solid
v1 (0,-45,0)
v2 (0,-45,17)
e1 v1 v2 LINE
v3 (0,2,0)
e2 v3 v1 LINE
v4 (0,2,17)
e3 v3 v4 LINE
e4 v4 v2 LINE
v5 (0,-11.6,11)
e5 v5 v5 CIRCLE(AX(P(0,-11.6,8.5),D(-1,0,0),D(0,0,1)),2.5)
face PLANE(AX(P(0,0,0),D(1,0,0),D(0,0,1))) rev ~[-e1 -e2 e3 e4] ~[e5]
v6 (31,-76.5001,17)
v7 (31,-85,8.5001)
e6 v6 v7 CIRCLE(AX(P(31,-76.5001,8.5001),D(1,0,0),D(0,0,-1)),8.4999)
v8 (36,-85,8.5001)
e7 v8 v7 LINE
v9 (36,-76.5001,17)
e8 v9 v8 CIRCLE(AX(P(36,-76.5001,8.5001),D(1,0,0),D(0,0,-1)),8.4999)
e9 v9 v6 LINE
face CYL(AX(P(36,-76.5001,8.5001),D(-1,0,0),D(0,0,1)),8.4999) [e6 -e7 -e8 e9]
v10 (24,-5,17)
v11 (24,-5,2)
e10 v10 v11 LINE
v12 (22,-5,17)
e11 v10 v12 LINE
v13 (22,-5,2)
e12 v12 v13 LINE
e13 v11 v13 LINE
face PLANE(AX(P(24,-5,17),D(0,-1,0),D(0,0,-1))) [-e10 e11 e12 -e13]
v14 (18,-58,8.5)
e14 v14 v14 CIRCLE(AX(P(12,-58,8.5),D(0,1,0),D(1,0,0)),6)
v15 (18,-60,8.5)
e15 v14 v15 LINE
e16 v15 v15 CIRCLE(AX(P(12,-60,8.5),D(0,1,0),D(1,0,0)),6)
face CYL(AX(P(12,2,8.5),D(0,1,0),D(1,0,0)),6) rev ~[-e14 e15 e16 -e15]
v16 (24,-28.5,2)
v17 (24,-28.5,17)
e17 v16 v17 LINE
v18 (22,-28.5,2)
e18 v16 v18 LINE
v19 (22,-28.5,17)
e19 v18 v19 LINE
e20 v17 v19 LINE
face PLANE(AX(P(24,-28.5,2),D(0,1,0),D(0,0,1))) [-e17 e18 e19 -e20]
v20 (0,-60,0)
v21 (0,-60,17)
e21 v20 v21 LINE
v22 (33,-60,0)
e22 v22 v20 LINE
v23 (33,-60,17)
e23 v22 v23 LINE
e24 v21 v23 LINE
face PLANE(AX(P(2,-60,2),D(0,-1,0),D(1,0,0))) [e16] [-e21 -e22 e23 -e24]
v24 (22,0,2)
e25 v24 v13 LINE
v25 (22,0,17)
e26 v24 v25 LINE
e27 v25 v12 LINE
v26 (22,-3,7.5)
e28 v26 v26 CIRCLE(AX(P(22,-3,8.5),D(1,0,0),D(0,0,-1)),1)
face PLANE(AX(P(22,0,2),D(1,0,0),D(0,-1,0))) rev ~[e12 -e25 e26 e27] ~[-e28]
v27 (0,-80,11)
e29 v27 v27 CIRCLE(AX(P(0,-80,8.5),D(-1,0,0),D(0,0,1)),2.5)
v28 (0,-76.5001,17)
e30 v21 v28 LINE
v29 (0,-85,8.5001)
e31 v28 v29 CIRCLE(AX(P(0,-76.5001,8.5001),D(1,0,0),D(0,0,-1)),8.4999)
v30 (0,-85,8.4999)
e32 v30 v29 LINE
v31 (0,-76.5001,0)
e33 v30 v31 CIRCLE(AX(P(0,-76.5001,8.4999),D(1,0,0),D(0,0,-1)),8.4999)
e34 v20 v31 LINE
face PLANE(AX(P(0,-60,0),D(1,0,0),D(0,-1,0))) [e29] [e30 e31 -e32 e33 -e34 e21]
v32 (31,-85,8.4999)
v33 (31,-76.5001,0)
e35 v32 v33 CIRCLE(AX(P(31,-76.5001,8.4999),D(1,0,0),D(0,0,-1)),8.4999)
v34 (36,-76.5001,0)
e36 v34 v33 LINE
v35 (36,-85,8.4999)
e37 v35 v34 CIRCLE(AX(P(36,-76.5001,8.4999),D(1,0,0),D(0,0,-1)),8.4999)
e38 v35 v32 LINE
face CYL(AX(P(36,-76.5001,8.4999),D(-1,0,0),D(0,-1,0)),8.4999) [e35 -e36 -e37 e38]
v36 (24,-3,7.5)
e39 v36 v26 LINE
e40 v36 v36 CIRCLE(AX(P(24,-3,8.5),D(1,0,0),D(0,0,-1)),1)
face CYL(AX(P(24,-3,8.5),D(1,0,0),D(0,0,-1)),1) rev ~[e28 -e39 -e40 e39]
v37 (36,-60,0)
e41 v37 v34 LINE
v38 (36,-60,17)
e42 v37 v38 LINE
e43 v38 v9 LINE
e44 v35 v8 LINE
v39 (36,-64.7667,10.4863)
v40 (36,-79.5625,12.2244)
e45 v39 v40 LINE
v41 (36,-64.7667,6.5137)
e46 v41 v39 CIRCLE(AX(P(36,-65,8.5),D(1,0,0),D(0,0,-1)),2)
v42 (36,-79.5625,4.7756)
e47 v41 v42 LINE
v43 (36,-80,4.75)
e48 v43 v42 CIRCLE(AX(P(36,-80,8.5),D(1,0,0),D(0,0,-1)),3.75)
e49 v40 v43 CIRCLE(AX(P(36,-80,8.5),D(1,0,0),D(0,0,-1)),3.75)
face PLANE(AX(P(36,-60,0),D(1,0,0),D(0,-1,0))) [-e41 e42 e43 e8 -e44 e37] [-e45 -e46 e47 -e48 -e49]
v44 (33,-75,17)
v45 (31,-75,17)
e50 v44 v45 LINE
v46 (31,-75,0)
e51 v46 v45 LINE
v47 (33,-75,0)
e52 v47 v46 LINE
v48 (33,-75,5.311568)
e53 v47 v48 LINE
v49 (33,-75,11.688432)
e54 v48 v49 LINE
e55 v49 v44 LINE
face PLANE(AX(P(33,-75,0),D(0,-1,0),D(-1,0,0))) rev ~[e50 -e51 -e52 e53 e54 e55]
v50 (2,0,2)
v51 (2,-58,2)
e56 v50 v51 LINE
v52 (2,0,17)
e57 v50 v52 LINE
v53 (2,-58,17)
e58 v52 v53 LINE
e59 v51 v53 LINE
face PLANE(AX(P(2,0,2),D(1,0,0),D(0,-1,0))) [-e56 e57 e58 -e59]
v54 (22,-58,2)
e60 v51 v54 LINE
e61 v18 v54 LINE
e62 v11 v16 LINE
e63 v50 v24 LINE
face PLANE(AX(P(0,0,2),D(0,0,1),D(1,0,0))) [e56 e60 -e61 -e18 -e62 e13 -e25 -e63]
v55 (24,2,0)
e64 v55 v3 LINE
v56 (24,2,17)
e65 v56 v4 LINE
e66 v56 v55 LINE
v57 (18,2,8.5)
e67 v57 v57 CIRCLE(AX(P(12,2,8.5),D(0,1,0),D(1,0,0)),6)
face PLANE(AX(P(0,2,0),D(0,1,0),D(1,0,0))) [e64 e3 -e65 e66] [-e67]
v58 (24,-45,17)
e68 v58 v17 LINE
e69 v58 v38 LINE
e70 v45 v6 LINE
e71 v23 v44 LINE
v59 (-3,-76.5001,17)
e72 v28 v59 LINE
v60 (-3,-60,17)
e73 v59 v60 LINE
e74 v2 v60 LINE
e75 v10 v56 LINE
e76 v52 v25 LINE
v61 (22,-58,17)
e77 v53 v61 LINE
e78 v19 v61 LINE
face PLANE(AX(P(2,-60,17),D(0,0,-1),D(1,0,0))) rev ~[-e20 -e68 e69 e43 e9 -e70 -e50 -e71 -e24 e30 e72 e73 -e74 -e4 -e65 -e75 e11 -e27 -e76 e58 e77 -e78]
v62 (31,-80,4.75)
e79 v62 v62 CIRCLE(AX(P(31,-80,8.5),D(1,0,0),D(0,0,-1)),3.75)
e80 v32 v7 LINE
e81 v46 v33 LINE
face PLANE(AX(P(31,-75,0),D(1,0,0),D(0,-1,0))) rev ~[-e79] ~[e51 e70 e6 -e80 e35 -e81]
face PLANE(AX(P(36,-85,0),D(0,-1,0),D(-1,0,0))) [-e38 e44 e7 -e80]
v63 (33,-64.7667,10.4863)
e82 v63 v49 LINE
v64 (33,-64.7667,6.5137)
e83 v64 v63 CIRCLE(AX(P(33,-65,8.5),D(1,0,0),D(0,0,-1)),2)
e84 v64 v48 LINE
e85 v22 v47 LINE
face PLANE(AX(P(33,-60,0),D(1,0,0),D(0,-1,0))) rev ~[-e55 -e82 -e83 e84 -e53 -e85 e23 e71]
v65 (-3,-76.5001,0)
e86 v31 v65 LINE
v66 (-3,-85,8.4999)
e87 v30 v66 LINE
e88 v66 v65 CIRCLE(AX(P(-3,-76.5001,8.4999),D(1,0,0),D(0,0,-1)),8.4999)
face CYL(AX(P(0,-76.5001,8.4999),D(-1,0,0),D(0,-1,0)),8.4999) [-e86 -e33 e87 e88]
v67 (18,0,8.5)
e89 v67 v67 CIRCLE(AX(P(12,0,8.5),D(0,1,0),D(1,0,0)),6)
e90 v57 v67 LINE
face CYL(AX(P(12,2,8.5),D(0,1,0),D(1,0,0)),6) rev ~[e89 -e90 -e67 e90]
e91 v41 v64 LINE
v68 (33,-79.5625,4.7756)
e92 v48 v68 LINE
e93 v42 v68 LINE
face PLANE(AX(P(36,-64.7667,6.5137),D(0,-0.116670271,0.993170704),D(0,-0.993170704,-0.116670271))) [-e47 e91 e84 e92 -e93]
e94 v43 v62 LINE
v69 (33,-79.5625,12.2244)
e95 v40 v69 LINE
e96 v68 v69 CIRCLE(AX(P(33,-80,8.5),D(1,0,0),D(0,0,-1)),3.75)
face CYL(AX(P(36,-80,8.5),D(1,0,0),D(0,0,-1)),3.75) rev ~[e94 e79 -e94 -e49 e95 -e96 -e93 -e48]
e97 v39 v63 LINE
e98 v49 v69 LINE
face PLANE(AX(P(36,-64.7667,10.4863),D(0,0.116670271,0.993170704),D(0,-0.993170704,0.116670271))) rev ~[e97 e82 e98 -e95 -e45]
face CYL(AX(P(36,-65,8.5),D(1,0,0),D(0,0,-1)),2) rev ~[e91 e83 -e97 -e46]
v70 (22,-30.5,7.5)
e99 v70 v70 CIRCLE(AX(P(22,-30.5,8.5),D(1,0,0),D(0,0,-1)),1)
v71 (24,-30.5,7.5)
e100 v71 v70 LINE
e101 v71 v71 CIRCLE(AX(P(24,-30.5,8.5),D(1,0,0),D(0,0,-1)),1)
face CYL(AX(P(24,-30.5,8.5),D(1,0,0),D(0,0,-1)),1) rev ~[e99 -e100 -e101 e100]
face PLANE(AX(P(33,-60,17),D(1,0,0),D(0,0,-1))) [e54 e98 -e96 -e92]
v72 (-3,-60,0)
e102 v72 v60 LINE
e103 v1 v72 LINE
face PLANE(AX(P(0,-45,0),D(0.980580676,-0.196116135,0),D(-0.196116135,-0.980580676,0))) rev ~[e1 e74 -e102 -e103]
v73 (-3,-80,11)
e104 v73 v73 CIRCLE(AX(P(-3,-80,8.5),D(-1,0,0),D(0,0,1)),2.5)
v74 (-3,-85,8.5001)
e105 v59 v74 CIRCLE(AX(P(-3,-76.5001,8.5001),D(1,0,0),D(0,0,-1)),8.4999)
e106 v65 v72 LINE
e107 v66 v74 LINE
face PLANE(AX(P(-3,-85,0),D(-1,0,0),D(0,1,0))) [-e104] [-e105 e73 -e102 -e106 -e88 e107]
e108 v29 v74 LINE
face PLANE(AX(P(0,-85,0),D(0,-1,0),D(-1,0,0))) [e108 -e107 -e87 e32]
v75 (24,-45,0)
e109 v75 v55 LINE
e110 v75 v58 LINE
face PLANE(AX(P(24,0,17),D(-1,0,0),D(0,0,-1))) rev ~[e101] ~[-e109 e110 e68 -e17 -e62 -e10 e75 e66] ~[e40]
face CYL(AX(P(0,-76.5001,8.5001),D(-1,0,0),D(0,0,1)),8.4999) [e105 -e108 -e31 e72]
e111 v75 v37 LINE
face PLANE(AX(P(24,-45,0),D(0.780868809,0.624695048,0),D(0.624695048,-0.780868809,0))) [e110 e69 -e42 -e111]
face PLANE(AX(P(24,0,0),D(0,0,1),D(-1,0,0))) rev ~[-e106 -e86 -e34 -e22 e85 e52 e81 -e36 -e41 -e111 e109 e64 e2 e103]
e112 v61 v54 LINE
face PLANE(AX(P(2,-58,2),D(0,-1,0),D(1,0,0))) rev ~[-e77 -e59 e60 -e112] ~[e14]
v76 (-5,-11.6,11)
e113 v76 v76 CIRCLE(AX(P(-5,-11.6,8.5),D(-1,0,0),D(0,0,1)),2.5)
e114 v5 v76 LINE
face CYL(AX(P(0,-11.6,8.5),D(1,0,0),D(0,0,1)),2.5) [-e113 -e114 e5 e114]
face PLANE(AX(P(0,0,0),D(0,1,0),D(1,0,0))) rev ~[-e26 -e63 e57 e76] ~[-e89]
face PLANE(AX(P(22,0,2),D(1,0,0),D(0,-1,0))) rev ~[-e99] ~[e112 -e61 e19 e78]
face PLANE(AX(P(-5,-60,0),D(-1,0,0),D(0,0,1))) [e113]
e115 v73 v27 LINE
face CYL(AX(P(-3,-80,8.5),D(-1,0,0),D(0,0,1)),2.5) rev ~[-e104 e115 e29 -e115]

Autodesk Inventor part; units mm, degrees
ref_plane "YZ Plane" through (0, 0, 0) normal (1, 0, 0) x (0, 1, 0)
ref_plane "XZ Plane" through (0, 0, 0) normal (0, 1, 0) x (-1, 0, 0)
ref_plane "XY Plane" through (0, 0, 0) normal (0, 0, 1) x (1, 0, 0)
sketch "Sketch1" plane through (0, 0, 0) normal (0, 0, 1) x (1, 0, 0)
  line L0 (0, 0) -> (24, 0)
  line L1 (24, 0) -> (24, -60)
  line L2 (24, -60) -> (0, -60)
  line L3 (0, -60) -> (0, 0)
  dimension "d0" = 24
  dimension "d1" = 60
extrude "Extrusion1" add sketch "Sketch1" along normal blind 2
sketch "Sketch2" plane through (0, 0, 2) normal (0, 0, 1) x (1, 0, 0)
  line L0 (0, -60) -> (24, -60) projected
  line L1 (0, 0) -> (2, 0)
  line L2 (2, 0) -> (2, -60)
  line L3 (2, -60) -> (0, -60)
  line L4 (0, -60) -> (0, 0)
  line L5 (24, -60) -> (24, 0) projected
  line L6 (24, 0) -> (22, 0)
  line L7 (22, 0) -> (22, -60)
  line L8 (22, -60) -> (24, -60)
  line L9 (24, -60) -> (24, 0)
  dimension "d4" = 2
  dimension "d5" = 2
extrude "Extrusion2" add sketch "Sketch2" along normal blind 15
sketch "Sketch3" plane through (24, -60, 0) normal (1, 0, 0) x (0, 0, -1)
  circle A0 centre (-8.5, 57) radius 1
  circle A1 centre (-8.5, 29.5) radius 1
  line L0 (-17, 0) -> (-17, 60) projected
  line L1 (0, 60) -> (-17, 60) projected
  dimension "d8" = 2
  dimension "d9" = 2
  dimension "d10" = 8.5
  dimension "d11" = 8.5
  dimension "d12" = 27.5
  dimension "d13" = 3
extrude "Extrusion3" cut sketch "Sketch3" against normal up to surface (2 mm away)
sketch "Sketch4" plane through (24, -60, 0) normal (1, 0, 0) x (0, 0, -1)
  line L0 (-17, 60) -> (-17, 0) projected
  line L1 (-17, 55) -> (-2, 55)
  line L2 (-2, 55) -> (-2, 31.5)
  line L3 (-2, 31.5) -> (-17, 31.5)
  line L4 (-17, 31.5) -> (-17, 55)
  circle A0 centre (-8.5, 57) radius 1 projected
  circle A1 centre (-8.5, 29.5) radius 1 projected
  point P0 (-17, 31.5)
  dimension "d23" = 15
  dimension "d24" = 23.5
  dimension "d25" = 2
  dimension "d26" = 2
extrude "Extrusion4" cut sketch "Sketch4" against normal up to surface (2 mm away) contours L1 L2 L3 L0
sketch "Sketch5" plane through (0, -60, 0) normal (-1, 0, 0) x (0, 0, 1)
  circle A0 centre (8.5, 48.4) radius 2.5
  circle A1 centre (8.5, 57) radius 1 projected
  point P0 (0, 60)
  dimension "d29" = 5
  dimension "d32" = 8.6
  dimension "d33" = 0
extrude "Extrusion5" add sketch "Sketch5" along normal blind 5 contours A0
sketch "Sketch12" plane through (0, 0, 0) normal (0, 0, -1) x (-1, 0, 0)
  line L0 (3, -60) -> (-36, -60)
  line L1 (-36, -60) -> (-36, -85)
  line L2 (-36, -85) -> (3, -85)
  line L3 (3, -85) -> (3, -60)
  line L4 (0, 0) -> (0, -60) projected
  line L5 (-2, -60) -> (-22, -60) projected
  line L6 (3, -60) -> (0, -60)
  line L7 (0, -60) -> (0, -85)
  line L8 (0, -85) -> (3, -85)
  line L9 (3, -85) -> (3, -60)
  line L10 (-36, -60) -> (-31, -60)
  line L11 (-31, -60) -> (-31, -85)
  line L12 (-31, -85) -> (-36, -85)
  line L13 (-36, -85) -> (-36, -60)
  line L14 (-31, -60) -> (-33, -60)
  line L15 (-33, -60) -> (-33, -75)
  line L16 (-33, -75) -> (-31, -75)
  line L17 (-31, -75) -> (-31, -60)
  dimension "d52" = 3
  dimension "d53" = 25
  dimension "d54" = 0
  dimension "d55" = 3
  dimension "d56" = 5
  dimension "d83" = 31
  dimension "d92" = 2
  dimension "d93" = 15
extrude "Extrusion9" add sketch "Sketch12" against normal up to surface (17 mm away) contours L3 L2 L7 L0 | L2 L1 L0 L15 L16 L11
sketch "Sketch13" plane through (0, 0, 0) normal (0, 0, -1) x (-1, 0, 0)
  line L0 (-33, -60) -> (-36, -60) projected
  line L1 (0, -60) -> (-24, -60) projected
  line L2 (-36, -60) -> (-24, -60)
  line L3 (-24, -60) -> (-24, -45)
  line L4 (-24, -45) -> (-36, -60)
  line L5 (0, -60) -> (0, -45)
  line L6 (0, 0) -> (0, -60) projected
  line L7 (0, -60) -> (15, -60) construction
  line L8 (0, -45) -> (3, -60)
  line L9 (3, -60) -> (0, -60)
  point P0 (-31, -60)
  dimension "d59" = 15
  dimension "d60" = 90
  dimension "d63" = 15
  dimension "d64" = 90
extrude "Extrusion10" add sketch "Sketch13" against normal up to surface (17 mm away)
sketch "Sketch14" plane through (-3, -85, 0) normal (-1, 0, 0) x (0, 0, 1)
  circle A0 centre (8.5, 5) radius 2.5
  line L0 (17, 0) -> (17, 25) projected
  line L1 (0, 25) -> (17, 25) projected
  point P0 (0, 85)
  dimension "d65" = 5
  dimension "d66" = 8.5
  dimension "d67" = 20
extrude "Extrusion11" cut sketch "Sketch14" against normal up to surface (39 mm away)
sketch "Sketch15" plane through (0, 0, 0) normal (0, 1, 0) x (1, 0, 0)
  line L0 (24, -17) -> (24, 0) projected
  line L1 (2, -17) -> (0, -17) projected
  line L2 (24, 0) -> (0, 0)
  line L3 (0, 0) -> (0, -17)
  line L4 (0, -17) -> (24, -17)
  line L5 (24, -17) -> (24, 0)
extrude "Extrusion12" add sketch "Sketch15" along normal blind 2
sketch "Sketch16" plane through (2, -60, 2) normal (0, -1, 0) x (1, 0, 0)
  line L0 (0, 15) -> (20, 15) projected
  line L1 (0, 0) -> (20, 0) projected
  line L2 (0, 15) -> (20, 15)
  line L3 (20, 15) -> (20, 0)
  line L4 (20, 0) -> (0, 0)
  line L5 (0, 0) -> (0, 15)
  point P0 (-2, -2)
  point P1 (20, 15)
extrude "Extrusion13" add sketch "Sketch16" against normal blind 2
sketch "Sketch17" plane through (0, 2, 0) normal (0, 1, 0) x (1, 0, 0)
  circle A0 centre (12, -8.5) radius 6
  line L0 (24, -17) -> (24, 0) projected
  line L1 (24, 0) -> (0, 0) projected
  dimension "d74" = 12
  dimension "d75" = 12
  dimension "d76" = 8.5
extrude "Extrusion14" cut sketch "Sketch17" against normal up to surface (62 mm away)
fillet "Fillet2" radius 8.5 4 edges at (33.5, -85, 0) (-1.5, -85, 0) (33.5, -85, 17) (-1.5, -85, 17)
sketch "Sketch18" plane through (36, -60, 17) normal (1, 0, 0) x (0, 0, -1)
  circle A0 centre (8.5, -20) radius 2.5 projected
  circle A1 centre (8.5, -20) radius 3.75
  point P0 (17, 60)
  dimension "d80" = 7.5
extrude "Extrusion15" cut sketch "Sketch18" against normal up to surface (5 mm away) contours A0 | A1
sketch "Sketch20" plane through (36, -60, 17) normal (1, 0, 0) x (0, 0, -1)
  circle A0 centre (8.5, -5) radius 2
  circle A1 centre (8.5, -20) radius 3.75 projected
  line L0 (10.4863, -4.7667) -> (12.2244, -19.5625)
  line L1 (6.5137, -4.7667) -> (4.7756, -19.5625)
  circle A2 centre (8.5, -5) radius 2
  circle A3 centre (8.5, -20) radius 3.75
  line L2 (10.4863, -4.7667) -> (12.2244, -19.5625)
  line L3 (6.5137, -4.7667) -> (4.7756, -19.5625)
  point P0 (17, 60)
  dimension "d84" = 4
  dimension "d85" = 15
  dimension "d86" = 0
  dimension "d89" = 4
  dimension "d90" = 15
  dimension "d91" = 0
extrude "Extrusion16" cut sketch "Sketch20" against normal blind 3 contours A0 | A0 L0 A1 L1
properties part number "juncao2"
